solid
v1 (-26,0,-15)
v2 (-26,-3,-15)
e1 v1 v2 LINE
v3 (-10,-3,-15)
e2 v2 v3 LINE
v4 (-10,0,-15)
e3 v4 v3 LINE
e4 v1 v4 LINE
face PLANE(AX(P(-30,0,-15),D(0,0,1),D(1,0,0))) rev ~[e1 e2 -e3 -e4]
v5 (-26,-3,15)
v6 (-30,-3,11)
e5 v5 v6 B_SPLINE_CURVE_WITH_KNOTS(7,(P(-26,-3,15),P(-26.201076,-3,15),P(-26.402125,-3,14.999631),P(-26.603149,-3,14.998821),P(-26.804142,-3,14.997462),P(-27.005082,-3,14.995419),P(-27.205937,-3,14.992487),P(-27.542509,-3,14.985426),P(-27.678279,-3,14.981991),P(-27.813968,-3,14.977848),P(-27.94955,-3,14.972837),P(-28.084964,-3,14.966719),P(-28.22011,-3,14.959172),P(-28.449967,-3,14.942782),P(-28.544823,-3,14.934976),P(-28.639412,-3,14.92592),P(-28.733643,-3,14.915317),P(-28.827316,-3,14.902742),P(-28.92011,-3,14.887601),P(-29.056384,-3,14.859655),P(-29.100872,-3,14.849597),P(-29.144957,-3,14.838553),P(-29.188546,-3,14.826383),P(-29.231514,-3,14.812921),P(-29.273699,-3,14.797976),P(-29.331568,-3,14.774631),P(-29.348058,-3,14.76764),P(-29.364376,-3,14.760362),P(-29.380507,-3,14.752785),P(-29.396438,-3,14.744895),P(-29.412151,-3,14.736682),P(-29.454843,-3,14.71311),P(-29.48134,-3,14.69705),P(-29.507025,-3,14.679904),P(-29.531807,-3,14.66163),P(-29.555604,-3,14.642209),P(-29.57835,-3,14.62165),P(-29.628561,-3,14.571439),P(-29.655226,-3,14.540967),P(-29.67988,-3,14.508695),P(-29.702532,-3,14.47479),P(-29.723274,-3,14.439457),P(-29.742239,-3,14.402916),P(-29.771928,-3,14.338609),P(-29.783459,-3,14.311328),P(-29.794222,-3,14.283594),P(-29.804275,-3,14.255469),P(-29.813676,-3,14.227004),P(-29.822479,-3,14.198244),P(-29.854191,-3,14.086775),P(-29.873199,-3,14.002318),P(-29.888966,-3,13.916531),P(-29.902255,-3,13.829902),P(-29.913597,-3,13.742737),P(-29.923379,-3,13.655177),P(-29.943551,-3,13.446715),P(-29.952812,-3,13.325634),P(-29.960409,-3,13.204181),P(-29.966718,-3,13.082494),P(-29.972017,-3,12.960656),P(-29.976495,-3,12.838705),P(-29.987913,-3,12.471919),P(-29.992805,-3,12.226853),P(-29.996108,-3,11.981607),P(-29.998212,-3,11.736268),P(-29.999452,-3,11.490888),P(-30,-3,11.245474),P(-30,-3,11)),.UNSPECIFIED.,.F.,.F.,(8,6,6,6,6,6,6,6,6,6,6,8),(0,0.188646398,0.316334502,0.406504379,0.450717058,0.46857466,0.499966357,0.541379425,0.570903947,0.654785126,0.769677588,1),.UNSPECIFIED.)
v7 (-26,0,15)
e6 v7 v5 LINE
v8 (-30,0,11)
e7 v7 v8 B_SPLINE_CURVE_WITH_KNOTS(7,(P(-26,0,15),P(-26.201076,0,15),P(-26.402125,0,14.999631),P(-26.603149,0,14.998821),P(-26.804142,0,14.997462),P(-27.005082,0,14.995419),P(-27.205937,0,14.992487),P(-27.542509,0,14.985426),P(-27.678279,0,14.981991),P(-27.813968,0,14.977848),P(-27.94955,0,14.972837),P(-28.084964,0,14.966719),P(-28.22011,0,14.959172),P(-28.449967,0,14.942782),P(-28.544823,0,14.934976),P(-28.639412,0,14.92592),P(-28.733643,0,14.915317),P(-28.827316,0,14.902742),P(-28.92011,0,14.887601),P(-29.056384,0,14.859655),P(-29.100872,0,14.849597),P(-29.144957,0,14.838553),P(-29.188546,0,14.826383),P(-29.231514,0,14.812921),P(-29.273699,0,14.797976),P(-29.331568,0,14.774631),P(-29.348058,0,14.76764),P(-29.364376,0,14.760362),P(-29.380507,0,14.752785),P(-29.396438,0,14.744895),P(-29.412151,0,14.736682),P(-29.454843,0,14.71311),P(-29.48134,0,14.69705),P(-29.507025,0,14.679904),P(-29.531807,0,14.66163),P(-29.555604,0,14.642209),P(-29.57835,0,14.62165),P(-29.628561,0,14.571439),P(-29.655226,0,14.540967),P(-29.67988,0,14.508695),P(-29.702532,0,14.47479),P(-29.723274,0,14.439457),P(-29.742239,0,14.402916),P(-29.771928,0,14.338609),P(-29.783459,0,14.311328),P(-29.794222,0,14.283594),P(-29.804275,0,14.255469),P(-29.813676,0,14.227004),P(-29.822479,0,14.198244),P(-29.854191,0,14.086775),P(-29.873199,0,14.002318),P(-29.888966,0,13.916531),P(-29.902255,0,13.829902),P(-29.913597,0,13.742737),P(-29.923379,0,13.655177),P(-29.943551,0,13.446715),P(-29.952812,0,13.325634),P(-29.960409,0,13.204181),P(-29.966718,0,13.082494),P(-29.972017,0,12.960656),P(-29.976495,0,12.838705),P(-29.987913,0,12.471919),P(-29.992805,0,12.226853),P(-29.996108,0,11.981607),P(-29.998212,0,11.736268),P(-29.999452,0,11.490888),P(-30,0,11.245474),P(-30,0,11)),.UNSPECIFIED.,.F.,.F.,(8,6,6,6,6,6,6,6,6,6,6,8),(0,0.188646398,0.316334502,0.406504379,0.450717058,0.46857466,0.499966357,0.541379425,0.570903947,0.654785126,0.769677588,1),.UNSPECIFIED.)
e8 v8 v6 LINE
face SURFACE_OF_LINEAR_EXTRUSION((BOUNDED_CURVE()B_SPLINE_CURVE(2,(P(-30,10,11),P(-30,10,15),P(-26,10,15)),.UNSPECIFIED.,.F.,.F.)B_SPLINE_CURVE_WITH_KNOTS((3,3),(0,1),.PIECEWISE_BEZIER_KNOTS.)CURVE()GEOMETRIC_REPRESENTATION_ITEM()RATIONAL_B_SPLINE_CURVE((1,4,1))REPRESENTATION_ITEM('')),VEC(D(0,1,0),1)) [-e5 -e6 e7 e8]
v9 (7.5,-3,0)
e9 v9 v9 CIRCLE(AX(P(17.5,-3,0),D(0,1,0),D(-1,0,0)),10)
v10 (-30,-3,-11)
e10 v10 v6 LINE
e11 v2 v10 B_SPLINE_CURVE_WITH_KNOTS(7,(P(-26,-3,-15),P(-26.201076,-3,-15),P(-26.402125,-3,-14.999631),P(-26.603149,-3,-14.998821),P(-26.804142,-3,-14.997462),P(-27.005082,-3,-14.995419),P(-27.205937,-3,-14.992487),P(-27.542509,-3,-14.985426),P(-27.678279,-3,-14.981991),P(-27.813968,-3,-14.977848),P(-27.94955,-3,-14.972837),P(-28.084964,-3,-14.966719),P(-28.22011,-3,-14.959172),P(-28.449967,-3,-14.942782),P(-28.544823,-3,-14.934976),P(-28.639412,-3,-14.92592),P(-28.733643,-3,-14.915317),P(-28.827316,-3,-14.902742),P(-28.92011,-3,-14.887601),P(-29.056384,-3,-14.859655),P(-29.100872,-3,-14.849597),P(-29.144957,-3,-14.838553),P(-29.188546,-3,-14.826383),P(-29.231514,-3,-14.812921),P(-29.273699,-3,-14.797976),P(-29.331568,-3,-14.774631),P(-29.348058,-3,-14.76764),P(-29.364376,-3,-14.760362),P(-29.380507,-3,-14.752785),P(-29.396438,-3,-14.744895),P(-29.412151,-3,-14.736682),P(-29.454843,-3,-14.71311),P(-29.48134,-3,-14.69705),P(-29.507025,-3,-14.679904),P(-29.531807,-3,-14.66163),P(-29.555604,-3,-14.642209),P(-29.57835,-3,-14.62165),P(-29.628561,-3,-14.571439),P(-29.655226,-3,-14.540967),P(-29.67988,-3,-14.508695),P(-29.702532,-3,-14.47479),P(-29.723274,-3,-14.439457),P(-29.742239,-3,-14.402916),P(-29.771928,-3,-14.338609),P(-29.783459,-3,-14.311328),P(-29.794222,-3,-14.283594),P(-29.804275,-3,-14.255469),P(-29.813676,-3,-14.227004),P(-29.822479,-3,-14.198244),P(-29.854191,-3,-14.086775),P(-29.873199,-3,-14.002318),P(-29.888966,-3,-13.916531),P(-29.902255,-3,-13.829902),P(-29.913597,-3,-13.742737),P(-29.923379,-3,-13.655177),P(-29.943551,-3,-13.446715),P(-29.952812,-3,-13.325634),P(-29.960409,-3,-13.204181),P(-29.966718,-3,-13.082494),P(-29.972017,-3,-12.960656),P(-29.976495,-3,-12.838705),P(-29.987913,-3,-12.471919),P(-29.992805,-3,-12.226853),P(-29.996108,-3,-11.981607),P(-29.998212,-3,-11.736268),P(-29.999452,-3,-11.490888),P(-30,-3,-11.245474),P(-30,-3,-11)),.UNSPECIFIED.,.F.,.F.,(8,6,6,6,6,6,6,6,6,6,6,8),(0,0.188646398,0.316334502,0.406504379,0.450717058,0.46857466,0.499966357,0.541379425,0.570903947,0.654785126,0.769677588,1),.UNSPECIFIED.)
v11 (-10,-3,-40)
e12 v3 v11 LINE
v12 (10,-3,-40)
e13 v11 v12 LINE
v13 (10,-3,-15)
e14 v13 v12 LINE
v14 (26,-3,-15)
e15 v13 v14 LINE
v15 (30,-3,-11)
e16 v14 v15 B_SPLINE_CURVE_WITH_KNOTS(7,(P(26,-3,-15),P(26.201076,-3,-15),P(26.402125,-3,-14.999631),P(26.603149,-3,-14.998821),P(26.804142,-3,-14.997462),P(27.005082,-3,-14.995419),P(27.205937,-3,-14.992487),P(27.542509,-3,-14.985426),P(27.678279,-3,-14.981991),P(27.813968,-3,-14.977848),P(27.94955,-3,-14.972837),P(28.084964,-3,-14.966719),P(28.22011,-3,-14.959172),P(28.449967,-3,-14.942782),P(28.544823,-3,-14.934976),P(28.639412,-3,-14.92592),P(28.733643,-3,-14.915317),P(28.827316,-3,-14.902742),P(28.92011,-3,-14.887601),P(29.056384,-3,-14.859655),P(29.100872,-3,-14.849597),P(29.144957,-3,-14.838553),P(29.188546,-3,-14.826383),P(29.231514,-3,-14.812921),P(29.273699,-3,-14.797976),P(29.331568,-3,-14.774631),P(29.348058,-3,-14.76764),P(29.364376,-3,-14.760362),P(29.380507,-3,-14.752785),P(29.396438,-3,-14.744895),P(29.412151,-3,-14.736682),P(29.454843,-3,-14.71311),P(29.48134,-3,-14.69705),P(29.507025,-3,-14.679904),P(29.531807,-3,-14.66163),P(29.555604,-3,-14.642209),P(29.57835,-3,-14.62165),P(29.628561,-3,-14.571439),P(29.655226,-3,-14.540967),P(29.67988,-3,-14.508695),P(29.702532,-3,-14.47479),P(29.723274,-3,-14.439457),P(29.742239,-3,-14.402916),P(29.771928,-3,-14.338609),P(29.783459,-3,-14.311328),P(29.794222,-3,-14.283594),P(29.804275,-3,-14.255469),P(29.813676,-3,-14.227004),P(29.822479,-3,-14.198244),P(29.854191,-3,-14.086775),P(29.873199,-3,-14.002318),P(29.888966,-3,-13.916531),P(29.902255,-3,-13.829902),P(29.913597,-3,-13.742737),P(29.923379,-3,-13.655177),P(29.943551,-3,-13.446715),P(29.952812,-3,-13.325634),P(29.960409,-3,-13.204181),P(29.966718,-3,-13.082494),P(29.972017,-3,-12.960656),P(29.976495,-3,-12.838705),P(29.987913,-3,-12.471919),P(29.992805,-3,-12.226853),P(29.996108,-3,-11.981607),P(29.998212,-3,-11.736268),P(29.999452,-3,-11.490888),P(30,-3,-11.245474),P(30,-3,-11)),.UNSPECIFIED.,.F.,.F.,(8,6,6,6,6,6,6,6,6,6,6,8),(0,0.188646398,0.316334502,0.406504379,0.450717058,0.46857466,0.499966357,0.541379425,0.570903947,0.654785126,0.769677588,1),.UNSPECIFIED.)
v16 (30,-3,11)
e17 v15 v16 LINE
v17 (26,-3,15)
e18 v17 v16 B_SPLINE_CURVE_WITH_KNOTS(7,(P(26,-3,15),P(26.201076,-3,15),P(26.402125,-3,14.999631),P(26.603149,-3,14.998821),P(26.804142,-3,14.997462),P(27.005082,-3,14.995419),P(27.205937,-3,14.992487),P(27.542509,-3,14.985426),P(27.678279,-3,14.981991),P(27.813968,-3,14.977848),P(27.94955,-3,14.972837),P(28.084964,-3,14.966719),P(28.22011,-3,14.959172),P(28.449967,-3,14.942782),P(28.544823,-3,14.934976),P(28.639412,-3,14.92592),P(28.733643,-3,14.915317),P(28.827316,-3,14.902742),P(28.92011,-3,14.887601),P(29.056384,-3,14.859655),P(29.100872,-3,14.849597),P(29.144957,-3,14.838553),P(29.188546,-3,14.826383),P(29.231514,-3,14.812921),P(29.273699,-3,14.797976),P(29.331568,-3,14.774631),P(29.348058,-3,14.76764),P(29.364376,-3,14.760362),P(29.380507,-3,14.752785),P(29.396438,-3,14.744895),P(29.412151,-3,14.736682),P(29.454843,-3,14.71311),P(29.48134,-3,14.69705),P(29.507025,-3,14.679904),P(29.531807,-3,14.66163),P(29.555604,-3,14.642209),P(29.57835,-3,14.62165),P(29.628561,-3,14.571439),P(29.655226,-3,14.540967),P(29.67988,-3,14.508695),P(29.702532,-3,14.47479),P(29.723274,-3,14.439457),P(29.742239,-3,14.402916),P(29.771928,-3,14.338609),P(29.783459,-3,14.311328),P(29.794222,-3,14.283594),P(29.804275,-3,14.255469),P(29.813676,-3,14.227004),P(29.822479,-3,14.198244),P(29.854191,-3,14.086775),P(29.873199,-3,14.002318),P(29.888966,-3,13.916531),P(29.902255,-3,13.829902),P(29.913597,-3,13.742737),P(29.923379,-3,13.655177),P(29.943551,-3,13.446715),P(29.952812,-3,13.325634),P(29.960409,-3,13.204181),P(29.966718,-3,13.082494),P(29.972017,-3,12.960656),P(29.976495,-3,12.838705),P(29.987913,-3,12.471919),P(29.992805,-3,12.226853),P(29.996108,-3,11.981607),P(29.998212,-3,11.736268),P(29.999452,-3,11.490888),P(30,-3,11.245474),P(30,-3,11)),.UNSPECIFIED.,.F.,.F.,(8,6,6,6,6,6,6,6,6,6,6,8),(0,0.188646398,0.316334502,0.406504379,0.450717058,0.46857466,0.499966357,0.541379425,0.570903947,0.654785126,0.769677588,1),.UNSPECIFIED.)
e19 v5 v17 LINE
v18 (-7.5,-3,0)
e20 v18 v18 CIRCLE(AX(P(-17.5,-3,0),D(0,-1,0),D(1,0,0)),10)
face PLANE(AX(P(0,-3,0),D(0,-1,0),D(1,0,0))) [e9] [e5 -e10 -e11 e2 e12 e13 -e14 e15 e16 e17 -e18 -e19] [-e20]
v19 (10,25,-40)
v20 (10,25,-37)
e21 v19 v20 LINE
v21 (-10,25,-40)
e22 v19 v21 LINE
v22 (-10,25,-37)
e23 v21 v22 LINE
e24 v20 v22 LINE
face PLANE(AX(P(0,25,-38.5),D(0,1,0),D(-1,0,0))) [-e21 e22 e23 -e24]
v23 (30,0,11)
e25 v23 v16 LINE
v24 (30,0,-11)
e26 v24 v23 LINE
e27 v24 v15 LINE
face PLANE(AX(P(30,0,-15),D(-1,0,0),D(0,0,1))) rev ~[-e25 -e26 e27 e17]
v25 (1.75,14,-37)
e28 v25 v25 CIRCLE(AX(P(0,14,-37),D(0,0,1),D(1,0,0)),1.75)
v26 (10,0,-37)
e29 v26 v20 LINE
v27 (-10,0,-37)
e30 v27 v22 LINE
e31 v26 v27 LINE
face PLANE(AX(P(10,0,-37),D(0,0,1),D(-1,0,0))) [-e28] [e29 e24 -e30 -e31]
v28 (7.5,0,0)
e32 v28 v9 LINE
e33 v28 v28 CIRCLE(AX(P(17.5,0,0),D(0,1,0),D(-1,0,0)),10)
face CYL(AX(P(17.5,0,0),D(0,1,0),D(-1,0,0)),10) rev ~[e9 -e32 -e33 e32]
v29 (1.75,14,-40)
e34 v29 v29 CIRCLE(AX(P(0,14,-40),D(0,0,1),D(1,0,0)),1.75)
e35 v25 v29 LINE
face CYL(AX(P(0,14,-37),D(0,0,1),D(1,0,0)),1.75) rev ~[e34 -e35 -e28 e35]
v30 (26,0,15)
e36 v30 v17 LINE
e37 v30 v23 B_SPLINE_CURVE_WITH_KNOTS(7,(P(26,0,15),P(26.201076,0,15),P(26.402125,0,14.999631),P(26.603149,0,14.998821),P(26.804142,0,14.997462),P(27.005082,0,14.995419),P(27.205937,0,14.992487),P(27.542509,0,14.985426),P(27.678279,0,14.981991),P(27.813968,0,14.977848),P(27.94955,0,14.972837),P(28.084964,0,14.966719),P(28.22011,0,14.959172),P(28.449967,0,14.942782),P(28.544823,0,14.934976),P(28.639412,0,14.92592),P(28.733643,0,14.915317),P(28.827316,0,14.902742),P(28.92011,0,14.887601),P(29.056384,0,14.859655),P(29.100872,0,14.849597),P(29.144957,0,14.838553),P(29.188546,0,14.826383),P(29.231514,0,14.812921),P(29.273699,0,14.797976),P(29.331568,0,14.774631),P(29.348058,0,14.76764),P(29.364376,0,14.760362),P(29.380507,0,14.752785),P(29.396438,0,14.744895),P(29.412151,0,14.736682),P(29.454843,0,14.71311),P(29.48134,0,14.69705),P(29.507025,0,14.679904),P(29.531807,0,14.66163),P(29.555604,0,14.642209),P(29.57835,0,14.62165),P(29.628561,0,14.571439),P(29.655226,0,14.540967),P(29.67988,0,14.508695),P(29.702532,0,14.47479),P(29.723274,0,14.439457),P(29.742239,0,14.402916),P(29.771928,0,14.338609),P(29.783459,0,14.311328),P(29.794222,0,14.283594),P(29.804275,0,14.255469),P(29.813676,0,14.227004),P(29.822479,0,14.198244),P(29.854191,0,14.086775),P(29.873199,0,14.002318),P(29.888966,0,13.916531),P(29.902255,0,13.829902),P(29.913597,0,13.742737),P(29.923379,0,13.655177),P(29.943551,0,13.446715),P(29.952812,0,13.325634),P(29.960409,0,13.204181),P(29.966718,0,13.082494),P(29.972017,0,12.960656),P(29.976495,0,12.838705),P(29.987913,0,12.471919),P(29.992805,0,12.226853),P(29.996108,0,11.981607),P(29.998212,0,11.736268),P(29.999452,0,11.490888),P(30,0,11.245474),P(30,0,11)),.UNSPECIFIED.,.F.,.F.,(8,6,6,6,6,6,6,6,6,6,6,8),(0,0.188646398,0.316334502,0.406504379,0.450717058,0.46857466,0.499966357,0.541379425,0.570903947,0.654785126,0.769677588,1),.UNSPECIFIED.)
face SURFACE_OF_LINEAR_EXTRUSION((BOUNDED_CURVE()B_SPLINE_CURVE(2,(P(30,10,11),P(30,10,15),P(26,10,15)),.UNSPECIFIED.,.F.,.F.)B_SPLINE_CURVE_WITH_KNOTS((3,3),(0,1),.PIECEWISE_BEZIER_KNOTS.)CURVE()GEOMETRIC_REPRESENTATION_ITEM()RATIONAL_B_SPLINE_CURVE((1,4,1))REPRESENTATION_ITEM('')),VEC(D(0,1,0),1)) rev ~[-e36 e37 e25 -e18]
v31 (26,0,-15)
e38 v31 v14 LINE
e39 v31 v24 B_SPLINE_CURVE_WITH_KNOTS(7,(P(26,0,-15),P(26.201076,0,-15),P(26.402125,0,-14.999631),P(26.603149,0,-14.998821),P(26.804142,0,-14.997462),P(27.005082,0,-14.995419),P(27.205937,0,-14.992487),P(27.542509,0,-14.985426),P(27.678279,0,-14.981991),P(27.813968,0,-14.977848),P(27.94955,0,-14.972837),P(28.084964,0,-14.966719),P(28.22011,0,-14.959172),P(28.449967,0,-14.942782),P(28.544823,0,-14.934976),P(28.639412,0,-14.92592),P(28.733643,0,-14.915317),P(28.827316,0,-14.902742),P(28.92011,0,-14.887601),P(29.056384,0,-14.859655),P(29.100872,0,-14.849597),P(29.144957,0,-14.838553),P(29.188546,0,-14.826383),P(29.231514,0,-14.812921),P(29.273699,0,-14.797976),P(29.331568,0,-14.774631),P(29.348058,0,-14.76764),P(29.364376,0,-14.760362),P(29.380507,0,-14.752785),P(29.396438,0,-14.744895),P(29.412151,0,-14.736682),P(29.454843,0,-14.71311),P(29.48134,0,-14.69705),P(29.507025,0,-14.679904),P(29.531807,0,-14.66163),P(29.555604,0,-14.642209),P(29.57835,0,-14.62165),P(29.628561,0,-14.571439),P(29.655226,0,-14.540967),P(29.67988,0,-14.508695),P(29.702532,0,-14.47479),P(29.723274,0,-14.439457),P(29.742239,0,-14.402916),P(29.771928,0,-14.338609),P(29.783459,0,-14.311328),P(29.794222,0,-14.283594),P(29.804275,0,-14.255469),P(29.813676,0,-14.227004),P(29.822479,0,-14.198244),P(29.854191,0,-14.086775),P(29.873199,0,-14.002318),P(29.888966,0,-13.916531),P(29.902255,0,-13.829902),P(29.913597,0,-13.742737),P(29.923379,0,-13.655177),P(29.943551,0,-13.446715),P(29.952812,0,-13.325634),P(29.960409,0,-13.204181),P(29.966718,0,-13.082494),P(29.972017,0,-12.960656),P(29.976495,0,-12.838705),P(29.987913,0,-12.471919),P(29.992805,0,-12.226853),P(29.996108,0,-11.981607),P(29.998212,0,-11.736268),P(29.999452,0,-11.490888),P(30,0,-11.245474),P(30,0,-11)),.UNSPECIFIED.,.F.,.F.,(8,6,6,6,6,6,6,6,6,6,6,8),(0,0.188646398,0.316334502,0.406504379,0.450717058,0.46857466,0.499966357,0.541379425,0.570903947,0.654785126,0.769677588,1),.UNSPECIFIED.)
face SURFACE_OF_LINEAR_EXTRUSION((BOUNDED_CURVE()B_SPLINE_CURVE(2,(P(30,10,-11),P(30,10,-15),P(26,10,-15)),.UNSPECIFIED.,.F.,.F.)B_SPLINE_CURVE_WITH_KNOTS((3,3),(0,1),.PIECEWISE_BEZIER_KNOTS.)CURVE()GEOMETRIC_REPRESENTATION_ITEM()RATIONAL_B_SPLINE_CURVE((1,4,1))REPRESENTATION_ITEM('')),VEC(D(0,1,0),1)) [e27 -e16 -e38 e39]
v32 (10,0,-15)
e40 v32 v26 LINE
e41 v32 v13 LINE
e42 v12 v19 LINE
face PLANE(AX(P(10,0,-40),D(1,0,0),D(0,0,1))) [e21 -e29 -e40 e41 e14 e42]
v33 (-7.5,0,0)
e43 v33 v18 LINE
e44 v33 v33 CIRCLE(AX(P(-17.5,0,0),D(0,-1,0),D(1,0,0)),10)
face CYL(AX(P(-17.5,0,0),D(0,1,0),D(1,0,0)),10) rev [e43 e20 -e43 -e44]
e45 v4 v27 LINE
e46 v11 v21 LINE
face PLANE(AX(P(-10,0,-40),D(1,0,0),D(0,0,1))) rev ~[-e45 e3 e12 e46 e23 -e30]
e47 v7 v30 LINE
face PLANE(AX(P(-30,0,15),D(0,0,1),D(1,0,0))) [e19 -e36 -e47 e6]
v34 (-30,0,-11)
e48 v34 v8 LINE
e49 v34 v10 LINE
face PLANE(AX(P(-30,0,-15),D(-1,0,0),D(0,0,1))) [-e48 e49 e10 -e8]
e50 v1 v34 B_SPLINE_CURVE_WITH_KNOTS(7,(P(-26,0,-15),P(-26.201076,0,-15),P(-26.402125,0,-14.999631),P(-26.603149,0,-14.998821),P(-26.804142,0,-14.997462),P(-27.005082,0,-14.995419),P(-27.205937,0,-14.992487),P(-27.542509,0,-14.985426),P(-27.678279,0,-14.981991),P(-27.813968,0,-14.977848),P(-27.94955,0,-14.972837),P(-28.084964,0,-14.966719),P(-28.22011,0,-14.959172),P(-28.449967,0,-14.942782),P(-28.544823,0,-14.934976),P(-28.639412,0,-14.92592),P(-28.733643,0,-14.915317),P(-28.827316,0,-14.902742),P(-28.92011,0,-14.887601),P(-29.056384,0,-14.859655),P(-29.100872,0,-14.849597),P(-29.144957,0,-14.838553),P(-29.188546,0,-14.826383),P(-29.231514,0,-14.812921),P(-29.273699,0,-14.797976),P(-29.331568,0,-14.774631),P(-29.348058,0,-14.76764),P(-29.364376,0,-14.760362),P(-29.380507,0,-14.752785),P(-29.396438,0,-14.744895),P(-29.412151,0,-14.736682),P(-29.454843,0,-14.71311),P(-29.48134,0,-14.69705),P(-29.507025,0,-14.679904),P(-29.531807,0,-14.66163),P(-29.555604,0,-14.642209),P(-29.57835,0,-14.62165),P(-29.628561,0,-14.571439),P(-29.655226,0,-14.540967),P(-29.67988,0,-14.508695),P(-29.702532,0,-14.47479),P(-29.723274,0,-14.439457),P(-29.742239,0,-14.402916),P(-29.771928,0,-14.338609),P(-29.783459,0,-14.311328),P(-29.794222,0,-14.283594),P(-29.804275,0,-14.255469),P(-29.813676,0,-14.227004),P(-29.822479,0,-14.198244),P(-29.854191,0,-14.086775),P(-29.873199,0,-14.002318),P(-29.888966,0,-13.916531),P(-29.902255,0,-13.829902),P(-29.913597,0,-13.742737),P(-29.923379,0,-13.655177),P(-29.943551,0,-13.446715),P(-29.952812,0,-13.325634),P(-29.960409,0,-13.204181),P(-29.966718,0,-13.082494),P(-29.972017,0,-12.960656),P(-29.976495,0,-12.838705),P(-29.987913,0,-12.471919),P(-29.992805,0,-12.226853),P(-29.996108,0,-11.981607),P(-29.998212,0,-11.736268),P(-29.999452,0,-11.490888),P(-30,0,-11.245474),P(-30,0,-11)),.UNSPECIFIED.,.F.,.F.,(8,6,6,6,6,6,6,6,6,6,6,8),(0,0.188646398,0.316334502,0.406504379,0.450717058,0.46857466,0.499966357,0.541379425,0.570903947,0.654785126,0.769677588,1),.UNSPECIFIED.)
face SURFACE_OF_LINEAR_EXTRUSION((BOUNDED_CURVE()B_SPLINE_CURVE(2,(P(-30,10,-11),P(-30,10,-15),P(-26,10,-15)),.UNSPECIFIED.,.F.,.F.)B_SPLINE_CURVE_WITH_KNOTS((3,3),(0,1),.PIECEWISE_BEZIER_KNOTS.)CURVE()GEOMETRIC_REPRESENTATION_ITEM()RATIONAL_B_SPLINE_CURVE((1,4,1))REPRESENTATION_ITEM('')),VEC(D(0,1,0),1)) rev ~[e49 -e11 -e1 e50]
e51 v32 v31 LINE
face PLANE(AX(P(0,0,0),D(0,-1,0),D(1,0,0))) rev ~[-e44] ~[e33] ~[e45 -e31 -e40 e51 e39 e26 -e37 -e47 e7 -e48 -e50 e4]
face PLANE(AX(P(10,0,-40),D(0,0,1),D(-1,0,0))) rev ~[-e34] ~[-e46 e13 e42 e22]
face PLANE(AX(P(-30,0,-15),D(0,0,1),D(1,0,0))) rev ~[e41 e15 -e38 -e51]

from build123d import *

# Parameters (mm, degrees)
F0_W        = 60
F0_H        = 30
F0_R        = 10
F1_DEPTH    = 3
F2_T1_DEPTH = 23
F3_W        = 20
F3_H        = 3
F4_DEPTH    = 25
F5_W        = 20
F5_H        = 3
F6_DEPTH    = 25
F7_R        = 1.75
F8_DEPTH    = 3.0010001


# Not quite as in the source:
# - a fillet or chamfer that OpenCascade refuses, or shapes differently, is made with other operations: its cross-section is extruded or revolved along the edge and cut away or added


with BuildPart() as f1:
    # F0 (on Front) → F1 (new body)
    with BuildSketch(Plane.XZ):
        Rectangle(F0_W, F0_H)
        with Locations((-17.5, 0)):
            Circle(F0_R, mode=Mode.SUBTRACT)
        with BuildLine():
            ThreePointArc((27.5, 0), (17.5, -10), (7.5, 0))
            ThreePointArc((7.5, 0), (17.5, 10), (27.5, 0))
        make_face(mode=Mode.SUBTRACT)
    extrude(amount=F1_DEPTH)

    # F2: fillet of radius 4 on 4 edges, made by hand

    # F2_s2 → F2_t1 (cut)
    with BuildSketch(Plane.XZ.offset(-10)):
        with BuildLine():
            add(Edge.make_bspline(
                [(30, -11), (30, -15), (26, -15)],
                knots=[0, 0, 0, 1, 1, 1], degree=2, weights=[1, 4, 1]))
            Line((26, -15), (30, -15))
            Line((30, -15), (30, -11))
        make_face()
        with BuildLine():
            add(Edge.make_bspline(
                [(-30, -11), (-30, -15), (-26, -15)],
                knots=[0, 0, 0, 1, 1, 1], degree=2, weights=[1, 4, 1]))
            Line((-26, -15), (-30, -15))
            Line((-30, -15), (-30, -11))
        make_face()
        with BuildLine():
            add(Edge.make_bspline(
                [(30, 11), (30, 15), (26, 15)],
                knots=[0, 0, 0, 1, 1, 1], degree=2, weights=[1, 4, 1]))
            Line((26, 15), (30, 15))
            Line((30, 15), (30, 11))
        make_face()
        with BuildLine():
            add(Edge.make_bspline(
                [(-30, 11), (-30, 15), (-26, 15)],
                knots=[0, 0, 0, 1, 1, 1], degree=2, weights=[1, 4, 1]))
            Line((-26, 15), (-30, 15))
            Line((-30, 15), (-30, 11))
        make_face()
    extrude(amount=F2_T1_DEPTH, mode=Mode.SUBTRACT)

    # F3 (on face) → F4 (join)
    with BuildSketch(Plane(origin=(0, 0, -15), x_dir=(1, 0, 0), z_dir=(0, 0, -1))):
        with Locations((0, 1.5)):
            Rectangle(F3_W, F3_H)
    extrude(amount=F4_DEPTH)

    # F5 (on face) → F6 (join)
    with BuildSketch(Plane(origin=(0, 0, 0), x_dir=(-1, 0, 0), z_dir=(0, 1, 0))):
        with Locations((0, -38.5)):
            Rectangle(F5_W, F5_H)
    extrude(amount=F6_DEPTH)

    # F7 (on face) → F8 (cut, through all)
    with BuildSketch(Plane.XY.offset(-37)):
        with Locations((0, 14)):
            Circle(F7_R)
    extrude(amount=-F8_DEPTH, mode=Mode.SUBTRACT)


solid = f1.part
